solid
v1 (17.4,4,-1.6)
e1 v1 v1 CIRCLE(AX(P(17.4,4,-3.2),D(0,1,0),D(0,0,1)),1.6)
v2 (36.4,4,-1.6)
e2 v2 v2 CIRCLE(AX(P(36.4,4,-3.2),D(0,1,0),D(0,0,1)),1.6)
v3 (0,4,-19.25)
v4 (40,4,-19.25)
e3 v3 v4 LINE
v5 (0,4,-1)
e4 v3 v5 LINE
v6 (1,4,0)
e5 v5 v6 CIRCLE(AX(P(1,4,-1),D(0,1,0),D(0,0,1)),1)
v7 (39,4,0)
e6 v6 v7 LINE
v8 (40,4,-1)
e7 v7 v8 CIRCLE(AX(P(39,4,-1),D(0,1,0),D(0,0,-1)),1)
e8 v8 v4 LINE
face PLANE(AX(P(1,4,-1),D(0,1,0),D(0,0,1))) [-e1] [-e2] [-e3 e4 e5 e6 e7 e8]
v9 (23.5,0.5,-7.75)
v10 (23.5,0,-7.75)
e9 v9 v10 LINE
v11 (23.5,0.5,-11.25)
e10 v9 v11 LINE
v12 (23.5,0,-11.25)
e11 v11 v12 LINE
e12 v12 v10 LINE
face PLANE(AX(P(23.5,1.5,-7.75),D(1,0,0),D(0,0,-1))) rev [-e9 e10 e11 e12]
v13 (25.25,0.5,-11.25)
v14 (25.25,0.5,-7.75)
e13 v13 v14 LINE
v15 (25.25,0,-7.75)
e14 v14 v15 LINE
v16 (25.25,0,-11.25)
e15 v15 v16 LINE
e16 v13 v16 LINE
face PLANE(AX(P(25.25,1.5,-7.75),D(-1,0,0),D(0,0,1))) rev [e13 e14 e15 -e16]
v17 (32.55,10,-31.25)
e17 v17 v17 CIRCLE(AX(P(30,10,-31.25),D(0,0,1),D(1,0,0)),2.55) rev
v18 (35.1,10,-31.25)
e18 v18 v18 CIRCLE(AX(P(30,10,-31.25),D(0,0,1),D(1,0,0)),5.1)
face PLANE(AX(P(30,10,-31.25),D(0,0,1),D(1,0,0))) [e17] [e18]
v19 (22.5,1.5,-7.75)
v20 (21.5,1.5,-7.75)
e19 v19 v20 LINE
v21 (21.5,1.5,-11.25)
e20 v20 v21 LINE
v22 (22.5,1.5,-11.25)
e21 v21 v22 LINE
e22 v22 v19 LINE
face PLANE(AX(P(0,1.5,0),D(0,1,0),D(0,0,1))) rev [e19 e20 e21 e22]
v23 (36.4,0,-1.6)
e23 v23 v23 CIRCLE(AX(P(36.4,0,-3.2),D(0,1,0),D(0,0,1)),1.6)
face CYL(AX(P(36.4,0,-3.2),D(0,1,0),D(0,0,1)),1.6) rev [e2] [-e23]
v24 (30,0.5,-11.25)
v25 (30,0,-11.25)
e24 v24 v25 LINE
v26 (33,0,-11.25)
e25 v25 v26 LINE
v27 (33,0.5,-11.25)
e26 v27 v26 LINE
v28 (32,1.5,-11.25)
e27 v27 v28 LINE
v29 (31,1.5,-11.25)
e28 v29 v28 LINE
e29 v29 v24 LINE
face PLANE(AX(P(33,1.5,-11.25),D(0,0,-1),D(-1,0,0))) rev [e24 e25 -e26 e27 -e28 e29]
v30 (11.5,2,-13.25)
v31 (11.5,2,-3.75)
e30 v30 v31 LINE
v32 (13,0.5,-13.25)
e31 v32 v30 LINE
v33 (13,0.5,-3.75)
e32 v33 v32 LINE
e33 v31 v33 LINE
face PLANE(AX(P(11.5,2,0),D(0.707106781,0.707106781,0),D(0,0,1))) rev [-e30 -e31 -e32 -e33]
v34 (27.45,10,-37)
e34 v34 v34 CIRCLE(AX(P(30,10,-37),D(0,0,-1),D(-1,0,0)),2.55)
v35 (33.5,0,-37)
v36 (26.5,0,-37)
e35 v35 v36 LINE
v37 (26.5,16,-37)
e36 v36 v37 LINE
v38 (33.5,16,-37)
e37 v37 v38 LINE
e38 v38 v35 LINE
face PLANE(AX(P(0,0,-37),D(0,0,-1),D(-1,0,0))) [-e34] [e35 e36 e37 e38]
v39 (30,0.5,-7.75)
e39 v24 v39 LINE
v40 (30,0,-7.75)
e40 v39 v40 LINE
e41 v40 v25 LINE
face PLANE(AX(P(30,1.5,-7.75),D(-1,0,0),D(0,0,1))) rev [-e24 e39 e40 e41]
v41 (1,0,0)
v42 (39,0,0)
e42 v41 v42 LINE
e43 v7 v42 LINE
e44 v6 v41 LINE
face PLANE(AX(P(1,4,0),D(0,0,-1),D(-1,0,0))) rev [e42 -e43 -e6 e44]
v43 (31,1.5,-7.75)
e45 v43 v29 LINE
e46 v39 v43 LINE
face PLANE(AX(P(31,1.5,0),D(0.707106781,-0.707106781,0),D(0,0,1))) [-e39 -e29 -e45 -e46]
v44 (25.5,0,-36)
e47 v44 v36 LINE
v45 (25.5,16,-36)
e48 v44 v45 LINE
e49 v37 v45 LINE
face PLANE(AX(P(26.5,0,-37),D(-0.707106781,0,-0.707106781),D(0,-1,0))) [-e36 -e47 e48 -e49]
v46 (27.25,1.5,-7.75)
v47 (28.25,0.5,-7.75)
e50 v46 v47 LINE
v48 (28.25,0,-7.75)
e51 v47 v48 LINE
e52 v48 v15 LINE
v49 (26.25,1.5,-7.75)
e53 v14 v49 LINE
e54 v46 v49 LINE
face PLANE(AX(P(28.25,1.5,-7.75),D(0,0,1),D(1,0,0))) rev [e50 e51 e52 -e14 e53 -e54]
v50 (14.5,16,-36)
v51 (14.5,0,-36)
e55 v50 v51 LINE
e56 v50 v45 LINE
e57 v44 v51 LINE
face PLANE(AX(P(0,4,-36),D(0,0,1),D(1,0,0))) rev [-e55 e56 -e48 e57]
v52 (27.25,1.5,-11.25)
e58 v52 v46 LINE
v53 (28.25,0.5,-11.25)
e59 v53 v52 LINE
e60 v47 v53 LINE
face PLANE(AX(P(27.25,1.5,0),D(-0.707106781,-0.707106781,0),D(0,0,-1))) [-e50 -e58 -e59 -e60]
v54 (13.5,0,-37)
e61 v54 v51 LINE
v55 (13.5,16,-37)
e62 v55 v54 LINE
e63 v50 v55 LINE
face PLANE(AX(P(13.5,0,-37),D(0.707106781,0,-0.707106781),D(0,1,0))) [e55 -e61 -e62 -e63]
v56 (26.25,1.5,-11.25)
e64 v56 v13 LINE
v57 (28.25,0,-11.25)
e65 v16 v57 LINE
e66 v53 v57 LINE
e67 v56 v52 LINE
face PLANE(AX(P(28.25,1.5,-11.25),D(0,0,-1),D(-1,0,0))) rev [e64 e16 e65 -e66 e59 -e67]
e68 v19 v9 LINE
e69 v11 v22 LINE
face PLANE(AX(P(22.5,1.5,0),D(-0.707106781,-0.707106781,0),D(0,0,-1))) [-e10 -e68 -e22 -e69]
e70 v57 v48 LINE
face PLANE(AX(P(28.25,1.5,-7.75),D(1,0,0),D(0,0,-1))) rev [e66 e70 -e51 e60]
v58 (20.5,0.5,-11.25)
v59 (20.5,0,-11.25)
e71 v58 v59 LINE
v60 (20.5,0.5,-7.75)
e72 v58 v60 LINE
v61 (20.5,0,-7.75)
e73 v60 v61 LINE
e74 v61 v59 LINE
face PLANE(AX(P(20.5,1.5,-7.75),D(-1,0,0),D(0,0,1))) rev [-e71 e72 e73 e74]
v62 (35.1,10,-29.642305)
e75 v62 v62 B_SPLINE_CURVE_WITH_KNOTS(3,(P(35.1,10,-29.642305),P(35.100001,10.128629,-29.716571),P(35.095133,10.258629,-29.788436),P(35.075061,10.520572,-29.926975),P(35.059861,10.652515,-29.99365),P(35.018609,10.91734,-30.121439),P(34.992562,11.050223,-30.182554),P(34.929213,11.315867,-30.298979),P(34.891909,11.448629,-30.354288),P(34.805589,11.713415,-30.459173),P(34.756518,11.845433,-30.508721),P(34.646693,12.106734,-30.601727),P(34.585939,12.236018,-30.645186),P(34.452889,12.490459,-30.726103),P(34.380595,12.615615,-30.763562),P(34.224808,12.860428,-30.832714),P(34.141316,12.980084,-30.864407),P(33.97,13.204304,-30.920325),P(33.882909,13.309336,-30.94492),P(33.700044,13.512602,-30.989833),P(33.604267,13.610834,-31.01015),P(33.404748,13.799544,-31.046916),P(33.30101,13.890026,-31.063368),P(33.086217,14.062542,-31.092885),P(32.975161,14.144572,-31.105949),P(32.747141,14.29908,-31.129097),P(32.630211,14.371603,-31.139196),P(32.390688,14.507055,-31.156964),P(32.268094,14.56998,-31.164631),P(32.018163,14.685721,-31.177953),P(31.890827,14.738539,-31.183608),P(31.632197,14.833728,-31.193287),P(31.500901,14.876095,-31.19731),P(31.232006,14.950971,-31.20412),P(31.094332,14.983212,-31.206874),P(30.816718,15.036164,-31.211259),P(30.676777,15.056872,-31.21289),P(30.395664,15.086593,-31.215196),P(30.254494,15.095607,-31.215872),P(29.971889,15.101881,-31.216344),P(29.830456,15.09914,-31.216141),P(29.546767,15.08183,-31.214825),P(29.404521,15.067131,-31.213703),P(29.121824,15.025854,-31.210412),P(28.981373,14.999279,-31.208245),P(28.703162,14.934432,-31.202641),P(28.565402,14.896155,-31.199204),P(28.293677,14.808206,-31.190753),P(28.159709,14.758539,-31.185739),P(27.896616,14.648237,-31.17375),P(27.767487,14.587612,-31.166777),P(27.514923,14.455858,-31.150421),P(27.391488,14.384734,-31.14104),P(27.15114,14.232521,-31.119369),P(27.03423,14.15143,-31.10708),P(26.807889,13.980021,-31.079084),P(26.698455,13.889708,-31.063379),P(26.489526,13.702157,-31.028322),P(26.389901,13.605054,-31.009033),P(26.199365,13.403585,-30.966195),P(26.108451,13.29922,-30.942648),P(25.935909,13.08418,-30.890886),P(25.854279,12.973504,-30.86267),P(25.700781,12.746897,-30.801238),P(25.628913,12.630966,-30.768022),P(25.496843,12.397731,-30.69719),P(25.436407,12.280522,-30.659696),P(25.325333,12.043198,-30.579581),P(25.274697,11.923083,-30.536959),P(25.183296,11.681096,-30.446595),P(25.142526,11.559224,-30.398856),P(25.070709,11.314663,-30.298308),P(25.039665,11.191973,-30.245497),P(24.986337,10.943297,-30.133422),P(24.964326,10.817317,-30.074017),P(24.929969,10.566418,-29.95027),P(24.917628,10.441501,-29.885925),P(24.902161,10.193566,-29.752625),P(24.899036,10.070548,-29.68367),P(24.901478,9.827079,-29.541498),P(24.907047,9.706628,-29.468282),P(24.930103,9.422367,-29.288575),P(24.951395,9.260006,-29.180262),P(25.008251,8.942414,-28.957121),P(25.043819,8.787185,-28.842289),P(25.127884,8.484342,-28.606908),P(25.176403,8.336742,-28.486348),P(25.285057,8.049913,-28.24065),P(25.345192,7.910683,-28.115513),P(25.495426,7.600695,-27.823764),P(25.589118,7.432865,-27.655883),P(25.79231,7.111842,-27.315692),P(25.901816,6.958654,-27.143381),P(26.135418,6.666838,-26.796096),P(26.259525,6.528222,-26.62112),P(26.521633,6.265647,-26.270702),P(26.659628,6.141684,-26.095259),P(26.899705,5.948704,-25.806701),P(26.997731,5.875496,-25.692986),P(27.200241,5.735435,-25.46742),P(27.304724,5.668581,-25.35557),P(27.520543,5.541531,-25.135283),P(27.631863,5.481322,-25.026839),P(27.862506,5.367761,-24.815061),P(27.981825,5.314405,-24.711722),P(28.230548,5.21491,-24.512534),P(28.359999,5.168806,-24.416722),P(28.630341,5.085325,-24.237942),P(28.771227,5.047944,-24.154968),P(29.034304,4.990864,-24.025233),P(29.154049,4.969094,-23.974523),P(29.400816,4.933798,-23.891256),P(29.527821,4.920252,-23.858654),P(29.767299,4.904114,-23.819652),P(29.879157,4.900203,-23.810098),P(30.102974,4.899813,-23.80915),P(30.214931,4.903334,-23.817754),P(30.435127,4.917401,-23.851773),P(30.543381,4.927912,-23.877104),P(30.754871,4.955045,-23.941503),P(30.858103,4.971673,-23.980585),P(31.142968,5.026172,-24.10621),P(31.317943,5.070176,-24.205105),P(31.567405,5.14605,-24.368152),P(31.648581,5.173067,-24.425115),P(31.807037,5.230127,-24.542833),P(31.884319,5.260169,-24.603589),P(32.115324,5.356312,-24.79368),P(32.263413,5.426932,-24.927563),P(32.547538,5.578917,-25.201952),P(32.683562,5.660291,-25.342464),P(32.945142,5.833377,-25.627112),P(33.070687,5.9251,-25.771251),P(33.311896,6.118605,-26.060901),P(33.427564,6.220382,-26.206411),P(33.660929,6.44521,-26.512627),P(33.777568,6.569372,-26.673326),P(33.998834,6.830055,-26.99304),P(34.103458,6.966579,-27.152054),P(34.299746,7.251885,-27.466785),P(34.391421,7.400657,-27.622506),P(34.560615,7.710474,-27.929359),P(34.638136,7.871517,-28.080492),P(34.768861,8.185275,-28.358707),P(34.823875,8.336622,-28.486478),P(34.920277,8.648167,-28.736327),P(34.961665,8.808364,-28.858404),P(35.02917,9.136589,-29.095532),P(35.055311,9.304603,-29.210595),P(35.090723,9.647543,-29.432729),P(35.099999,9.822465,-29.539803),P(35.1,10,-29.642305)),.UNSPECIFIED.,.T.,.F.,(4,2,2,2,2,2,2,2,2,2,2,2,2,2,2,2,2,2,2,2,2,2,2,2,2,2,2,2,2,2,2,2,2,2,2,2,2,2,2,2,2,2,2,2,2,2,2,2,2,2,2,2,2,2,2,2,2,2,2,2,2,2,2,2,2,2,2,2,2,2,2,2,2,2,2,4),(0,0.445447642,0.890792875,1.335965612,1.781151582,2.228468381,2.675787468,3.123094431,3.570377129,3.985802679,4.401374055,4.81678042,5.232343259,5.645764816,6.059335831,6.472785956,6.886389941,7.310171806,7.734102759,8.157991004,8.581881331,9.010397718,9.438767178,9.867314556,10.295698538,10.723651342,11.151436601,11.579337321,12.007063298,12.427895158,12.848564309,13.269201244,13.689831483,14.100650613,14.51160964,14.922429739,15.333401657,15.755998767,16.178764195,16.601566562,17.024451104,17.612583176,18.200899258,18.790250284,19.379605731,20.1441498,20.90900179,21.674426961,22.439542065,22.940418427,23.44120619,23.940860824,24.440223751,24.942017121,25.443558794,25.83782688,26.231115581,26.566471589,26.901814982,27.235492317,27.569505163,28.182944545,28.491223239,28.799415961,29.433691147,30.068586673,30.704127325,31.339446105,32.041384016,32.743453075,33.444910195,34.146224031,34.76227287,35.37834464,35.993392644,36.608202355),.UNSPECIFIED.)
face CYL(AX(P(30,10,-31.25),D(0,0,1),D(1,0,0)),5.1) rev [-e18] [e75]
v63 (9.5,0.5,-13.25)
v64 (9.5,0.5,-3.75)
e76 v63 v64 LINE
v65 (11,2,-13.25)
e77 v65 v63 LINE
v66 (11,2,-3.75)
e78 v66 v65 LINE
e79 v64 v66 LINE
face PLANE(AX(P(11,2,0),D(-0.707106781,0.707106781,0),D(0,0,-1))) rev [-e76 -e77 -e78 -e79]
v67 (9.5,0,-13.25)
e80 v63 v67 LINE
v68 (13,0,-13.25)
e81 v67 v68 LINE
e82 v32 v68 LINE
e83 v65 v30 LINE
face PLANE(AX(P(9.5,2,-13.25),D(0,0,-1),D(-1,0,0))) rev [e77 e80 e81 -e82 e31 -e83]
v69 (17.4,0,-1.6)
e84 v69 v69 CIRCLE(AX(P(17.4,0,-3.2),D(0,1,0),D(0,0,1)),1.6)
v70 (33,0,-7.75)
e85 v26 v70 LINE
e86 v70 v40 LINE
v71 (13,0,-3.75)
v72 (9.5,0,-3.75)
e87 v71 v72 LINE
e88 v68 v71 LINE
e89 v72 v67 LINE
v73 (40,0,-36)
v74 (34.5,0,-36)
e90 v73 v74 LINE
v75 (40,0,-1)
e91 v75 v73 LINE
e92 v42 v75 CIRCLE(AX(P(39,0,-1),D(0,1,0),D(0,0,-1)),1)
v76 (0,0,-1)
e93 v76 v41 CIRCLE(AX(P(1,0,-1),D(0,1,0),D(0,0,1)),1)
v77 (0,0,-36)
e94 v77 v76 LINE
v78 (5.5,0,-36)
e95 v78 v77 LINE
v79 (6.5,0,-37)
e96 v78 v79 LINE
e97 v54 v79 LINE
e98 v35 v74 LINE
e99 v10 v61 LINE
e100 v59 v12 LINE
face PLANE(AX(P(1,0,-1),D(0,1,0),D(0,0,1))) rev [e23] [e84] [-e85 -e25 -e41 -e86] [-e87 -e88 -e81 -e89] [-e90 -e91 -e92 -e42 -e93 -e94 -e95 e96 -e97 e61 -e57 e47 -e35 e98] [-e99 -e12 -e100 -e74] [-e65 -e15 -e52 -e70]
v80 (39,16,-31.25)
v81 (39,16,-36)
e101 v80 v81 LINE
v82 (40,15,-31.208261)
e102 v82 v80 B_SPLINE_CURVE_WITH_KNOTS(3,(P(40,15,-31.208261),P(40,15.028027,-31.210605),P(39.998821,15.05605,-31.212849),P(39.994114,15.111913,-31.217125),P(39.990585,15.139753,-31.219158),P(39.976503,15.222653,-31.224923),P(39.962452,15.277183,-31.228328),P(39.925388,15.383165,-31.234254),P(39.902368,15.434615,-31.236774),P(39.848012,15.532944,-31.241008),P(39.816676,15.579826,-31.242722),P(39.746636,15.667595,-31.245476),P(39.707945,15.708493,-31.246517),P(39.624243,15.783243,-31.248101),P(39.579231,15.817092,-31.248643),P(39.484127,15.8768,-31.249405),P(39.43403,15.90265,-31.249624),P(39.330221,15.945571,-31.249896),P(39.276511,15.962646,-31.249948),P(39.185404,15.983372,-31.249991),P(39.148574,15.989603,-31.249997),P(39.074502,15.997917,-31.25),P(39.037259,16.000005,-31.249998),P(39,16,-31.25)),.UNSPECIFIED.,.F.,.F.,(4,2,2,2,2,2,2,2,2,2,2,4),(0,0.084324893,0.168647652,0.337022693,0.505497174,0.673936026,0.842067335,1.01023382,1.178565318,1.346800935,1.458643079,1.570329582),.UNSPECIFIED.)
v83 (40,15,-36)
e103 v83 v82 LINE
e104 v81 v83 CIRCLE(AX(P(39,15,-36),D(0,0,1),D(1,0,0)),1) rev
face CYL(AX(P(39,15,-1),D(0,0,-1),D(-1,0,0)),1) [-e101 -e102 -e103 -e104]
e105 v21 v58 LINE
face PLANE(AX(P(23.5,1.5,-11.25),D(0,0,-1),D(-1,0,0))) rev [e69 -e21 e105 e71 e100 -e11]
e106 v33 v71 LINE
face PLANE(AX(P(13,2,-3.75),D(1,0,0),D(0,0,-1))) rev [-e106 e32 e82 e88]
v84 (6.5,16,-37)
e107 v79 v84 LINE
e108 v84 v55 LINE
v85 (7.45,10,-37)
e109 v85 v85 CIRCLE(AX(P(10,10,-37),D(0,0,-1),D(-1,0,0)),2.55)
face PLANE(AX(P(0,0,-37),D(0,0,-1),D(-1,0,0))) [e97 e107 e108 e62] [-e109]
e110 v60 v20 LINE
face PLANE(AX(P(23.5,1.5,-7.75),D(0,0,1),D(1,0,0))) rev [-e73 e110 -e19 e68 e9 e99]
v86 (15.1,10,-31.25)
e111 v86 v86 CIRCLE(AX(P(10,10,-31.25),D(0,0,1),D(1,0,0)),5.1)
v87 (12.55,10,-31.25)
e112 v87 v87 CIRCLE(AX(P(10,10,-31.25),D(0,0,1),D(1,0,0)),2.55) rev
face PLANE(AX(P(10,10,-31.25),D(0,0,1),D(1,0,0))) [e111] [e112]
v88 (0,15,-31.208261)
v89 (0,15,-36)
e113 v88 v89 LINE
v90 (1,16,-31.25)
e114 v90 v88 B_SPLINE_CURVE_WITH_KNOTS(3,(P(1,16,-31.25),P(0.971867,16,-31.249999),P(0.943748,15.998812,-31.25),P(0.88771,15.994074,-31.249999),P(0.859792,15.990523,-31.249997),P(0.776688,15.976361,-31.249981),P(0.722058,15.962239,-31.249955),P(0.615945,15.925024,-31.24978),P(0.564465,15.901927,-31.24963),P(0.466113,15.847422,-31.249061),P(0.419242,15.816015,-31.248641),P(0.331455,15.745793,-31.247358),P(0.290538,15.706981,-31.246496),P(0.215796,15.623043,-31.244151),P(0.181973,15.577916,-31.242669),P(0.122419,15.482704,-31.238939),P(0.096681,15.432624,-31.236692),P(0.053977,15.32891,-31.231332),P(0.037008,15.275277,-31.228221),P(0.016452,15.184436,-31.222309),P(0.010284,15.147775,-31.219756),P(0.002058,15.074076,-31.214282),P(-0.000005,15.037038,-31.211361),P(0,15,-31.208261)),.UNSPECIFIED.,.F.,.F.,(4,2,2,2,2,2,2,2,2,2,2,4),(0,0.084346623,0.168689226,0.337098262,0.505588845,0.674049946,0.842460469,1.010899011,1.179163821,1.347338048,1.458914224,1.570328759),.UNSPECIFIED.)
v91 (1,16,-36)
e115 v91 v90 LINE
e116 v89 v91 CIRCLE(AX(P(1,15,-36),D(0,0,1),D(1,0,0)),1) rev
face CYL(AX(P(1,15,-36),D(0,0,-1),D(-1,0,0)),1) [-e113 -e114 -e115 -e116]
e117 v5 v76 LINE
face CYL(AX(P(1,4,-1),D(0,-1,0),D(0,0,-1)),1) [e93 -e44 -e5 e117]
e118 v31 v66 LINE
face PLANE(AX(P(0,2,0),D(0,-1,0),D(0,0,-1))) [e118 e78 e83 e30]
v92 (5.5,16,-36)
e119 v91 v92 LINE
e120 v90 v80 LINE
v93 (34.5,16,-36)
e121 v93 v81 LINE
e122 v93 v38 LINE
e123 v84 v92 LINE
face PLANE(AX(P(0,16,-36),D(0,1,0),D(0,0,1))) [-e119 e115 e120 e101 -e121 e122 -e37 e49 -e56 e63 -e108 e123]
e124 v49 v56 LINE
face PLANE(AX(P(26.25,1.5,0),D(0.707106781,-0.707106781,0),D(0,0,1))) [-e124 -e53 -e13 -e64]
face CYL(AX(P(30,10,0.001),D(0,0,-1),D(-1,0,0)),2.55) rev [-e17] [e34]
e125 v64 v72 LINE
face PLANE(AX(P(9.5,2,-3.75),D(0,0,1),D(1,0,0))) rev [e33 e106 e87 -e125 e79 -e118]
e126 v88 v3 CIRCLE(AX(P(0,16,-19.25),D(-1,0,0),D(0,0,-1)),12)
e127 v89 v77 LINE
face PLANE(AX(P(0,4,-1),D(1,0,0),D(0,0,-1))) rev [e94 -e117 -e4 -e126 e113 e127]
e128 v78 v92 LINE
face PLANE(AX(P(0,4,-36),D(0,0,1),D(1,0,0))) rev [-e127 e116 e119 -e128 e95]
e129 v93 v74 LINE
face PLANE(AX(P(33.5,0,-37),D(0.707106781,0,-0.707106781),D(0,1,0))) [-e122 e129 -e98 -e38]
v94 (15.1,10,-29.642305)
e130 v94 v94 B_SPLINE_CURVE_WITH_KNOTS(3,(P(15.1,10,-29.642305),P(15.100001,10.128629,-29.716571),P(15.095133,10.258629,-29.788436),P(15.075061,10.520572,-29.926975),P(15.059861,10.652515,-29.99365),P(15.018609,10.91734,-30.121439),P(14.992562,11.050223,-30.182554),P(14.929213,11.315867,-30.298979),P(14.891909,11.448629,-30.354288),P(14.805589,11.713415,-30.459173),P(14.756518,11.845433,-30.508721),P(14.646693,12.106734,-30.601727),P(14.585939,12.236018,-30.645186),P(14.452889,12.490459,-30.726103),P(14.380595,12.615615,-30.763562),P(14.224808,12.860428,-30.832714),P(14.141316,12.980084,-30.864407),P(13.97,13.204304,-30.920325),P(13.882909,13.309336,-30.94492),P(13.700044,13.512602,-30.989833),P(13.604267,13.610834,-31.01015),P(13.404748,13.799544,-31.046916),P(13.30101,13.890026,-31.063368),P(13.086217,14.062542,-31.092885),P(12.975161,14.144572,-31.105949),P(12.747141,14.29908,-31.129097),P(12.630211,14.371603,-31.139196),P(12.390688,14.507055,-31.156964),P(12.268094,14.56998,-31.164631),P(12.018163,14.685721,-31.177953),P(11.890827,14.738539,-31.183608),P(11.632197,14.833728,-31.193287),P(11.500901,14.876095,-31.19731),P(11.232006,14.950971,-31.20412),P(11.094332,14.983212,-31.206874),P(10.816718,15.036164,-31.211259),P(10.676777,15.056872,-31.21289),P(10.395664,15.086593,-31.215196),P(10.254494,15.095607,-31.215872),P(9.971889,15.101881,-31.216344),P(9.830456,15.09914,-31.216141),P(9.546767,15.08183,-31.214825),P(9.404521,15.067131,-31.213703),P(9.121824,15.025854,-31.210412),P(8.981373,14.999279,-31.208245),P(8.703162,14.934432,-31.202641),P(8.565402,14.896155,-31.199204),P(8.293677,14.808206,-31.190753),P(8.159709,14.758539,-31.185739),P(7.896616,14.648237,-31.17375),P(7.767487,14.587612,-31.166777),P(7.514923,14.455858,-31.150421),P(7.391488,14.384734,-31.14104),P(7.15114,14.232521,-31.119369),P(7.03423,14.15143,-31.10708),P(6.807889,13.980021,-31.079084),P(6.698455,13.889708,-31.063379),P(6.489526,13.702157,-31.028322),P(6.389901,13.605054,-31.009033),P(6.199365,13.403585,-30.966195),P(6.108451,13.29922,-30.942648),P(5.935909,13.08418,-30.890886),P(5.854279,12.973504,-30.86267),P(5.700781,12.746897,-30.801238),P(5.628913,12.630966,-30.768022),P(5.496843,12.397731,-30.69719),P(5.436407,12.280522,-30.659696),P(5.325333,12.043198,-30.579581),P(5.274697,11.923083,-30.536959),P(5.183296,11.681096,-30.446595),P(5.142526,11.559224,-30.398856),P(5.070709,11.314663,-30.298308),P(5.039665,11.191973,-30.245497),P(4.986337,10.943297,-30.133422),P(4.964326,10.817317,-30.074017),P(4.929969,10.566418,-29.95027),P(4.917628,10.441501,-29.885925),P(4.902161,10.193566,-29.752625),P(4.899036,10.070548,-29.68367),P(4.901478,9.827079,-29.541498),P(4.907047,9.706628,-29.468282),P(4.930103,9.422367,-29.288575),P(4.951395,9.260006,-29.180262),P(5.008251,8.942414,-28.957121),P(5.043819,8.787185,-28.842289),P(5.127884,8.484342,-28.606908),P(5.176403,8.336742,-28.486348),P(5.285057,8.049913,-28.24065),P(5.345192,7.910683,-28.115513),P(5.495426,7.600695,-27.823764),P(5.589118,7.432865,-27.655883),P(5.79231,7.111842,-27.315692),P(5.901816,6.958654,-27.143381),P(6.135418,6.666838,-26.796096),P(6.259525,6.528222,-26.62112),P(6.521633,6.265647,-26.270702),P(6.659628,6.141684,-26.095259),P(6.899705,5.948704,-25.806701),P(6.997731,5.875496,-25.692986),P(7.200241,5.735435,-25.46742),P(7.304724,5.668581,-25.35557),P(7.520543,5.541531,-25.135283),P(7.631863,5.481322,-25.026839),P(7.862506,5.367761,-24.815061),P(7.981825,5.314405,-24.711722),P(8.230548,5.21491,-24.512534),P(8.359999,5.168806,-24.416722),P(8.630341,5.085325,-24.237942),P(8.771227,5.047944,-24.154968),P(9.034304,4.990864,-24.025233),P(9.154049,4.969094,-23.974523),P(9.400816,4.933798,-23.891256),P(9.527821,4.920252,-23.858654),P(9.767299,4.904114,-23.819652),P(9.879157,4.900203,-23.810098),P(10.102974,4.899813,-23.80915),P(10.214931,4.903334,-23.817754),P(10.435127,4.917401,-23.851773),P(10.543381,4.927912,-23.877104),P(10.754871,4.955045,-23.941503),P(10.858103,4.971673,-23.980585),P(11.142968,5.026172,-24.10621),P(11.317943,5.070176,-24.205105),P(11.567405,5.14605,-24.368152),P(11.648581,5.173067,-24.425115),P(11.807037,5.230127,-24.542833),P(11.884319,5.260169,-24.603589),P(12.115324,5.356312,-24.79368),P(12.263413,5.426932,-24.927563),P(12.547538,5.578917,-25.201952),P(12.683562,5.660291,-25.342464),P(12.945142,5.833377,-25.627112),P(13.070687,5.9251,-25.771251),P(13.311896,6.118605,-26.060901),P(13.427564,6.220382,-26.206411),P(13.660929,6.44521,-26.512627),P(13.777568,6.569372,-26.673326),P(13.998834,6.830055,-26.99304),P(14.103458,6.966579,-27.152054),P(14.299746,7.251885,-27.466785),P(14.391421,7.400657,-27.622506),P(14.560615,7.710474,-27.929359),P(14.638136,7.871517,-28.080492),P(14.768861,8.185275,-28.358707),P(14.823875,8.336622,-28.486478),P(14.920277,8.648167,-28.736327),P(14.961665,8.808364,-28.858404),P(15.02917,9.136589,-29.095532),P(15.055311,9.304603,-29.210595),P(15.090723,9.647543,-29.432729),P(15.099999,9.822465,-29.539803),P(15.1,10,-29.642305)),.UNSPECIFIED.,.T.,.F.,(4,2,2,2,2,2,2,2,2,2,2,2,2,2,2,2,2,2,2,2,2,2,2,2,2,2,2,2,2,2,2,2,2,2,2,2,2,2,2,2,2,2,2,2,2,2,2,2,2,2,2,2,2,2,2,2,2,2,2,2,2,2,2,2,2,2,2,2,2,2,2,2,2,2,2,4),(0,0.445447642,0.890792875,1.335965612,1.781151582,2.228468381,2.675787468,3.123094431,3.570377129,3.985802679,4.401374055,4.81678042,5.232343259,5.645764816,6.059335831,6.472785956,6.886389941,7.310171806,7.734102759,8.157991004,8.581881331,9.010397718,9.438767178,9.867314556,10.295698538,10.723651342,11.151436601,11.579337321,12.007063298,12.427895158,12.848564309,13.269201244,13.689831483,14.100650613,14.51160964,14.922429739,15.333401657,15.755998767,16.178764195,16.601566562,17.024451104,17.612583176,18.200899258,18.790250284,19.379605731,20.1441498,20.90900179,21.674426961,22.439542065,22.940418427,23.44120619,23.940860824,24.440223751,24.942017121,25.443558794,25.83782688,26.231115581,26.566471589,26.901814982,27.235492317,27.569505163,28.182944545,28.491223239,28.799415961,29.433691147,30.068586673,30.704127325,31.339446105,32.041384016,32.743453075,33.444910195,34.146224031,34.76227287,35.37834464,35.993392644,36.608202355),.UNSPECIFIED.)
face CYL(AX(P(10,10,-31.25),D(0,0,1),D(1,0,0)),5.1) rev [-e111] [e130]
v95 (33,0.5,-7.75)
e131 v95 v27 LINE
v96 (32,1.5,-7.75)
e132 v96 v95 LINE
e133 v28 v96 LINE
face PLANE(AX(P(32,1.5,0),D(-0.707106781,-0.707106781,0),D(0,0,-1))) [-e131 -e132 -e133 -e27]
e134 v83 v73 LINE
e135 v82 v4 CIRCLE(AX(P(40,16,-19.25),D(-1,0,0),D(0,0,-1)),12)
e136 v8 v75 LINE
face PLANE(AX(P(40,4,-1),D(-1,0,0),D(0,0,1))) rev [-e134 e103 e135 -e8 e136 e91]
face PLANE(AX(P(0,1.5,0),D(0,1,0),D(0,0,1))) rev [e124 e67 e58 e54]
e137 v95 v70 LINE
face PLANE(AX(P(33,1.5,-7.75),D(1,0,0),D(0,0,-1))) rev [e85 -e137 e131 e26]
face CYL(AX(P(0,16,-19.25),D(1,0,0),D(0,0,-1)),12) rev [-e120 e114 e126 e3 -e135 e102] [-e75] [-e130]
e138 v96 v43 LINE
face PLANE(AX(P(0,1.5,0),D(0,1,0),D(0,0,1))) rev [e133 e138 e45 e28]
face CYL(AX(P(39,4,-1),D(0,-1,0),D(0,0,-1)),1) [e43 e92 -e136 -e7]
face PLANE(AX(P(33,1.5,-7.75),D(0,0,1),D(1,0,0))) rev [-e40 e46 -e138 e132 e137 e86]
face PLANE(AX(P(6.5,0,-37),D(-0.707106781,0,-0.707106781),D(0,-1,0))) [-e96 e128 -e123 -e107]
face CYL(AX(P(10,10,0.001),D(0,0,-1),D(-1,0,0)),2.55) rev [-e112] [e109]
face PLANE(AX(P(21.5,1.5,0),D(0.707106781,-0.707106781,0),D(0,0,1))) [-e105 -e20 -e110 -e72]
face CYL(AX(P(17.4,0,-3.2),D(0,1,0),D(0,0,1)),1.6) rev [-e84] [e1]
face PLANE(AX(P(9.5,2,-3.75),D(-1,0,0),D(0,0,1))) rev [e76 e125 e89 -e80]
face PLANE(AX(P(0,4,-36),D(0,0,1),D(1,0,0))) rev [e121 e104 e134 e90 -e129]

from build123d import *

# Parameters (mm, degrees)
BOSS_EXTRUDE1_DEPTH = 4
BOSS_EXTRUDE2_DEPTH = 40
SKETCH3_W           = 9
SKETCH3_H           = 16
BOSS_EXTRUDE3_DEPTH = 1
CHAMFER1_SIZE       = 1
SKETCH4_R           = 5.1
CUT_EXTRUDE1_DEPTH  = 31.25
CUT_EXTRUDE2_REACH  = 58.789
SKETCH5_R           = 2.55
FILLET1_R           = 1
SKETCH6_R           = 1.6
CUT_EXTRUDE3_DEPTH  = 56.794265031
SKETCH7_W           = 3
SKETCH7_H           = 3.5
CUT_EXTRUDE4_DEPTH  = 1.5
CHAMFER2_SIZE       = 1
SKETCH8_W           = 3.5
SKETCH8_H           = 9.5
CUT_EXTRUDE5_DEPTH  = 2
CHAMFER3_SIZE       = 1.5


with BuildPart() as part:
    # Sketch1 → Boss-Extrude1 (new body)
    with BuildSketch(Plane(origin=(0, 0, 0), x_dir=(1, 0, 0), z_dir=(0, 1, 0))):
        with BuildLine():
            Line((1, 0), (39, 0))
            ThreePointArc((39, 0), (39.707106781, 0.292893219), (40, 1))
            Line((40, 1), (40, 36))
            Line((40, 36), (0, 36))
            Line((0, 36), (0, 1))
            ThreePointArc((0, 1), (0.292893219, 0.292893219), (1, 0))
        make_face()
    extrude(amount=BOSS_EXTRUDE1_DEPTH)

    # Sketch2 → Boss-Extrude2 (add, through all)
    with BuildSketch(Plane(origin=(40, 0, 0), x_dir=(0, 0, -1), z_dir=(1, 0, 0))):
        with BuildLine():
            Line((36, 0), (36, 16))
            Line((36, 16), (31.25, 16))
            ThreePointArc((31.25, 16), (27.735281374, 7.514718626), (19.25, 4))
            Line((19.25, 4), (19.25, 0))
            Line((19.25, 0), (36, 0))
        make_face()
    extrude(amount=-BOSS_EXTRUDE2_DEPTH)

    # Sketch3 → Boss-Extrude3 (add)
    with BuildSketch(Plane(origin=(0, 0, -36), x_dir=(-1, 0, 0), z_dir=(0, 0, -1))):
        with Locations((-30, 8)):
            Rectangle(SKETCH3_W, SKETCH3_H)
        with Locations((-10, 8)):
            Rectangle(SKETCH3_W, SKETCH3_H)
    extrude(amount=BOSS_EXTRUDE3_DEPTH)

    # Chamfer1
    chamfer1_edges = [part.edges().sort_by_distance(p)[0] for p in [
        (25.5, 8, -37),
        (34.5, 8, -37),
        (14.5, 8, -37),
        (5.5, 8, -37),
    ]]
    chamfer(chamfer1_edges, length=CHAMFER1_SIZE - 0.0001)  # a hair under: the kernel refuses the full size

    # Sketch4 → Cut-Extrude1 (cut)
    with BuildSketch(Plane.XY):
        with Locations((10, 10)):
            Circle(SKETCH4_R)
        with Locations((30, 10)):
            Circle(SKETCH4_R)
    extrude(amount=-CUT_EXTRUDE1_DEPTH, mode=Mode.SUBTRACT)

    # Sketch5 → Cut-Extrude2 (cut, up to next)
    with BuildSketch(Plane(origin=(0, 0, -37), x_dir=(-1, 0, 0), z_dir=(0, 0, -1)), mode=Mode.PRIVATE) as cut_extrude2_sk1:
        with Locations((-30, 10)):
            Circle(SKETCH5_R)
    cut_extrude2_tool1 = extrude(cut_extrude2_sk1.sketch, amount=-CUT_EXTRUDE2_REACH, mode=Mode.PRIVATE) & part.part
    # Sketch5 → Cut-Extrude2 (cut, up to next)
    with BuildSketch(Plane(origin=(0, 0, -37), x_dir=(-1, 0, 0), z_dir=(0, 0, -1)), mode=Mode.PRIVATE) as cut_extrude2_sk2:
        with Locations((-10, 10)):
            Circle(SKETCH5_R)
    cut_extrude2_tool2 = extrude(cut_extrude2_sk2.sketch, amount=-CUT_EXTRUDE2_REACH, mode=Mode.PRIVATE) & part.part
    add(cut_extrude2_tool1.solids().sort_by_distance((30, 10, -37))[0], mode=Mode.SUBTRACT)
    add(cut_extrude2_tool2.solids().sort_by_distance((10, 10, -37))[0], mode=Mode.SUBTRACT)

    # Fillet1
    fillet1_edges = [part.edges().sort_by_distance(p)[0] for p in [
        (0, 16, -33.625),
        (40, 16, -33.625),
    ]]
    fillet(fillet1_edges, radius=FILLET1_R)

    # Sketch6 → Cut-Extrude3 (cut, through all)
    with BuildSketch(Plane(origin=(0, 4, 0), x_dir=(1, 0, 0), z_dir=(0, 1, 0))):
        with Locations(Location((36.4, 3.2, 0), (0, 0, 270))):
            Circle(SKETCH6_R)
        with Locations(Location((17.4, 3.2, 0), (0, 0, 270))):
            Circle(SKETCH6_R)
    extrude(amount=-CUT_EXTRUDE3_DEPTH, mode=Mode.SUBTRACT)

    # Sketch7 → Cut-Extrude4 (cut)
    with BuildSketch(Plane.XZ):
        with Locations((31.5, -9.5)):
            Rectangle(SKETCH7_W, SKETCH7_H)
        with Locations((26.75, -9.5)):
            Rectangle(SKETCH7_W, SKETCH7_H)
        with Locations((22, -9.5)):
            Rectangle(SKETCH7_W, SKETCH7_H)
    extrude(amount=-CUT_EXTRUDE4_DEPTH, mode=Mode.SUBTRACT)

    # Chamfer2
    chamfer2_edges = [part.edges().sort_by_distance(p)[0] for p in [
        (33, 1.5, -9.5),
        (30, 1.5, -9.5),
        (28.25, 1.5, -9.5),
        (25.25, 1.5, -9.5),
        (23.5, 1.5, -9.5),
        (20.5, 1.5, -9.5),
    ]]
    chamfer(chamfer2_edges, length=CHAMFER2_SIZE)

    # Sketch8 → Cut-Extrude5 (cut)
    with BuildSketch(Plane.XZ):
        with Locations((11.25, -8.5)):
            Rectangle(SKETCH8_W, SKETCH8_H)
    extrude(amount=-CUT_EXTRUDE5_DEPTH, mode=Mode.SUBTRACT)

    # Chamfer3
    chamfer3_edges = [part.edges().sort_by_distance(p)[0] for p in [
        (9.5, 2, -8.5),
        (13, 2, -8.5),
    ]]
    chamfer(chamfer3_edges, length=CHAMFER3_SIZE)


solid = part.part
